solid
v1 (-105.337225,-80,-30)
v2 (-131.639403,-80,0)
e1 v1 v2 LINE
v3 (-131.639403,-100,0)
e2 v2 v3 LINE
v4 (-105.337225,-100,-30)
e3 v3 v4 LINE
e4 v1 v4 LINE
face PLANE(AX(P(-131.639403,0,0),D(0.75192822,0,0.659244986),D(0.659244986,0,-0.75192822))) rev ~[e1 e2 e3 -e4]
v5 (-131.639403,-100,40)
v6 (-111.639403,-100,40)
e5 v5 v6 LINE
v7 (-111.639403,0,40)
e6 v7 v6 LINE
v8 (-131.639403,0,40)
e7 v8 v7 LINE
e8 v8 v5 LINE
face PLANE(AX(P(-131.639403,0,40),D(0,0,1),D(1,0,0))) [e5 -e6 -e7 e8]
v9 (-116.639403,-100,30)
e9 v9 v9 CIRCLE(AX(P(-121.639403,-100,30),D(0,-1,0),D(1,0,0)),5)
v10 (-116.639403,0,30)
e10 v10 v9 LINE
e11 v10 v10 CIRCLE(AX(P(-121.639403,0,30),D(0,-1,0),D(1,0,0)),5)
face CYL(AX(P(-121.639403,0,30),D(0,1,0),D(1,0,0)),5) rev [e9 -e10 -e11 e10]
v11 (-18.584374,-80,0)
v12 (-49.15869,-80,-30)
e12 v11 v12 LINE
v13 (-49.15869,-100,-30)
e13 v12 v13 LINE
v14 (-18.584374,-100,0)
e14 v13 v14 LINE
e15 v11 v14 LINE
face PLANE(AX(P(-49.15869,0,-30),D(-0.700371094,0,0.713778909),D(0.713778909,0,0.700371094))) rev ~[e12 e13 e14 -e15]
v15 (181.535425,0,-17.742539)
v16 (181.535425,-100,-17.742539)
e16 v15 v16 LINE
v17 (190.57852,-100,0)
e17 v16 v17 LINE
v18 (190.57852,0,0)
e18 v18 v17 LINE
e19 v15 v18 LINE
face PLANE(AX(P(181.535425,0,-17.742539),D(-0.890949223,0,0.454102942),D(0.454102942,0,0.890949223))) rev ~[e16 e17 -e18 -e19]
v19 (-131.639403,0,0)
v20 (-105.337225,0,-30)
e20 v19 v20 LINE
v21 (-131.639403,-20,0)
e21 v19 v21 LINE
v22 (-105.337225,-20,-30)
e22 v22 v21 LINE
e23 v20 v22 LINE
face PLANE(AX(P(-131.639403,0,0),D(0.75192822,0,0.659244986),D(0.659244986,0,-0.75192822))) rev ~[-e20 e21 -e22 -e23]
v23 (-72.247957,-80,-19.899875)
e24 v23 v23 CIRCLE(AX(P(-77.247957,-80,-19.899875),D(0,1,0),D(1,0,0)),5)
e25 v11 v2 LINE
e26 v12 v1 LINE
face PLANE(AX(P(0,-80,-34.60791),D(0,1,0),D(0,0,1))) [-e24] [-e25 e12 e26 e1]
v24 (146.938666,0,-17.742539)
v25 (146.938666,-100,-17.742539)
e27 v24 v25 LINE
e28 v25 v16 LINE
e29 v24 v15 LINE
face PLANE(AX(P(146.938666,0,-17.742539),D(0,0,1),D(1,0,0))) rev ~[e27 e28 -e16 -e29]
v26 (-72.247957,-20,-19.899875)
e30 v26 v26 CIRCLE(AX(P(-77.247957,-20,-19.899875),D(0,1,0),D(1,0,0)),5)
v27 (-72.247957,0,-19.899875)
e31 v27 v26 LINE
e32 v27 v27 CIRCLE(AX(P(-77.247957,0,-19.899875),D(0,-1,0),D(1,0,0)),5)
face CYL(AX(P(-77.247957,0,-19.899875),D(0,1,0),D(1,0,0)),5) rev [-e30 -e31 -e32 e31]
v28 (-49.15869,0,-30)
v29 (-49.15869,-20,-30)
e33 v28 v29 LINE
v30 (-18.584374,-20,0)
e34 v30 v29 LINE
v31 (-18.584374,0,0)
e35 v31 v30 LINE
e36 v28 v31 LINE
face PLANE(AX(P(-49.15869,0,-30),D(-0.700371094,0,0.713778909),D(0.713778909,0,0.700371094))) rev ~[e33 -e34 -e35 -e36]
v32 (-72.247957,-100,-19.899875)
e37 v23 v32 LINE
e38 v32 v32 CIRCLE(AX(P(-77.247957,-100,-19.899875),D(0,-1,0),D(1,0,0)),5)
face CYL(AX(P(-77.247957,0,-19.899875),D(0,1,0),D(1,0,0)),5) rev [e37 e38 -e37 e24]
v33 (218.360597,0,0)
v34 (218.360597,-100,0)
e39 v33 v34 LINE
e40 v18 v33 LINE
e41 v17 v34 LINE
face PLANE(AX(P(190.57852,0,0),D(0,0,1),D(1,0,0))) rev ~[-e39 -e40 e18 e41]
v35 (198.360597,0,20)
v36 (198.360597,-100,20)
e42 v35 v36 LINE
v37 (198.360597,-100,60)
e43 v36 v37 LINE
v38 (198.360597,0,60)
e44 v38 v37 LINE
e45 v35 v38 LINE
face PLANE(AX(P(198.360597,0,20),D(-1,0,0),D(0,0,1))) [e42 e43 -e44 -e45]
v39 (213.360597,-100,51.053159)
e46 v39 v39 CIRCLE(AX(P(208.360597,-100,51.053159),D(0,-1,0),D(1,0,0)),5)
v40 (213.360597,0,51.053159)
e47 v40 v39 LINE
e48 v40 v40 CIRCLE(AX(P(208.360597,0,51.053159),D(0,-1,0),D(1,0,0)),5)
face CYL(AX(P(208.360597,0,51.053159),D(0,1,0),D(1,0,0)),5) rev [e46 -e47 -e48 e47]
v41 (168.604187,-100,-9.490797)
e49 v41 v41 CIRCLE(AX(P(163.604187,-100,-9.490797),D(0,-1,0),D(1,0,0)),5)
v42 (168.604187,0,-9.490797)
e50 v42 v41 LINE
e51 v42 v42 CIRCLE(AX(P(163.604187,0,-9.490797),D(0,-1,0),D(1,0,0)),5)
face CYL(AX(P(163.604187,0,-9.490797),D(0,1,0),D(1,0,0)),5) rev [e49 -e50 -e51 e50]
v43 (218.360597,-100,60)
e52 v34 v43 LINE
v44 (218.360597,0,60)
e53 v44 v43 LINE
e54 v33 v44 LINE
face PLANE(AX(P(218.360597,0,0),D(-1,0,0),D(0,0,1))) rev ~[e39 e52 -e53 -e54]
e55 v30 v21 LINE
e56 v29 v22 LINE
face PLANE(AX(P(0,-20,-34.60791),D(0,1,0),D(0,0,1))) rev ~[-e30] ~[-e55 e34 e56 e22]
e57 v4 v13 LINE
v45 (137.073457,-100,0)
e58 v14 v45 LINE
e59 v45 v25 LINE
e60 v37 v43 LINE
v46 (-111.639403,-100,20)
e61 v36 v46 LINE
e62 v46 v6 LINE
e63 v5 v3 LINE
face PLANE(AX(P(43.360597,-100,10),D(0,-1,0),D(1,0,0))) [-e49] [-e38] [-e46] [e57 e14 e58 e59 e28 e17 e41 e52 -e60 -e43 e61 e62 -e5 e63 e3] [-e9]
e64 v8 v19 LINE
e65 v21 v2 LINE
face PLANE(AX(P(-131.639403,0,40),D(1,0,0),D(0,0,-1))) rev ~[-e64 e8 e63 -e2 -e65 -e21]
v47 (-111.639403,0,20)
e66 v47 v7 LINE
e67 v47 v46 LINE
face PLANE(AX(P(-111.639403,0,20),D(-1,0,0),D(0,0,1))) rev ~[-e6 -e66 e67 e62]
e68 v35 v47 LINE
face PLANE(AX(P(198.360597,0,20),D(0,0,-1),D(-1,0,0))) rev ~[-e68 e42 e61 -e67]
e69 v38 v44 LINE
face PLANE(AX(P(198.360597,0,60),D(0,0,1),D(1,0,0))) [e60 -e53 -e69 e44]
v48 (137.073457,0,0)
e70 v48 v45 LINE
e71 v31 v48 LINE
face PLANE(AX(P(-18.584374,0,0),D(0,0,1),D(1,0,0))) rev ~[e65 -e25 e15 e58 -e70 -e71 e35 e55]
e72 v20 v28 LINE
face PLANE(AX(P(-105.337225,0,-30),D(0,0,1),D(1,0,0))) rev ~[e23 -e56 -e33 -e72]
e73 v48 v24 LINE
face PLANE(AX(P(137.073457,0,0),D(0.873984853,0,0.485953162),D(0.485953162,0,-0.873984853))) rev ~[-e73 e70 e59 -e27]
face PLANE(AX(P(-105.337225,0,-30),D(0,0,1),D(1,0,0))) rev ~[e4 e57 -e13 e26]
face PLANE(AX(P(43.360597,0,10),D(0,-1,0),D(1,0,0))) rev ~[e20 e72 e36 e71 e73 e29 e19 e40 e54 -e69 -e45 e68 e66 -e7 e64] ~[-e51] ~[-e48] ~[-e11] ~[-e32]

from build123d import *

# Parameters (mm, degrees)
F0_W     = 20
F0_H     = 20
F0_R     = 5
F0_H_2   = 40
F1_DEPTH = 100
F2_W     = 60
F2_H     = 34.6079095881
F3_DEPTH = 131.6404025087


# Not quite as in the source:
# - a feature names something its author has since deleted; it is built from what else it names


with BuildPart() as f1:
    # F0 (on Front) → F1 (new body)
    with BuildSketch(Plane.XZ):
        Polygon((-131.6394025087, 20), (-131.6394025087, 0), (-18.5843738595, 0), (137.0734572411, 0), (190.578520298, 0), (218.3605974913, 0), (218.3605974913, 20), (198.3605974913, 20), (-111.6394025087, 20), align=None)
        with Locations((-121.6394025087, 30)):
            Rectangle(F0_W, F0_H)
        with Locations((-121.6394025087, 30)):
            Circle(F0_R, mode=Mode.SUBTRACT)
        with Locations((208.3605974913, 40)):
            Rectangle(F0_W, F0_H_2)
        with Locations((208.3605974913, 51.0531589389)):
            Circle(F0_R, mode=Mode.SUBTRACT)
        Polygon((190.578520298, 0), (137.0734572411, 0), (146.9386657926, -17.7425388247), (181.5354246128, -17.7425388247), align=None)
        with Locations((163.6041871454, -9.4907971493)):
            Circle(F0_R, mode=Mode.SUBTRACT)
        Polygon((-18.5843738595, 0), (-131.6394025087, 0), (-105.3372249007, -30), (-49.1586900184, -30), align=None)
        with Locations((-77.2479574596, -19.8998747039)):
            Circle(F0_R, mode=Mode.SUBTRACT)
    extrude(amount=F1_DEPTH)

    # F2 (on Right) → F3 (cut, through all)
    with BuildSketch(Plane.YZ):
        with Locations((-50, -17.3039547941)):
            Rectangle(F2_W, F2_H)
    extrude(amount=-F3_DEPTH, mode=Mode.SUBTRACT)


solid = f1.part
